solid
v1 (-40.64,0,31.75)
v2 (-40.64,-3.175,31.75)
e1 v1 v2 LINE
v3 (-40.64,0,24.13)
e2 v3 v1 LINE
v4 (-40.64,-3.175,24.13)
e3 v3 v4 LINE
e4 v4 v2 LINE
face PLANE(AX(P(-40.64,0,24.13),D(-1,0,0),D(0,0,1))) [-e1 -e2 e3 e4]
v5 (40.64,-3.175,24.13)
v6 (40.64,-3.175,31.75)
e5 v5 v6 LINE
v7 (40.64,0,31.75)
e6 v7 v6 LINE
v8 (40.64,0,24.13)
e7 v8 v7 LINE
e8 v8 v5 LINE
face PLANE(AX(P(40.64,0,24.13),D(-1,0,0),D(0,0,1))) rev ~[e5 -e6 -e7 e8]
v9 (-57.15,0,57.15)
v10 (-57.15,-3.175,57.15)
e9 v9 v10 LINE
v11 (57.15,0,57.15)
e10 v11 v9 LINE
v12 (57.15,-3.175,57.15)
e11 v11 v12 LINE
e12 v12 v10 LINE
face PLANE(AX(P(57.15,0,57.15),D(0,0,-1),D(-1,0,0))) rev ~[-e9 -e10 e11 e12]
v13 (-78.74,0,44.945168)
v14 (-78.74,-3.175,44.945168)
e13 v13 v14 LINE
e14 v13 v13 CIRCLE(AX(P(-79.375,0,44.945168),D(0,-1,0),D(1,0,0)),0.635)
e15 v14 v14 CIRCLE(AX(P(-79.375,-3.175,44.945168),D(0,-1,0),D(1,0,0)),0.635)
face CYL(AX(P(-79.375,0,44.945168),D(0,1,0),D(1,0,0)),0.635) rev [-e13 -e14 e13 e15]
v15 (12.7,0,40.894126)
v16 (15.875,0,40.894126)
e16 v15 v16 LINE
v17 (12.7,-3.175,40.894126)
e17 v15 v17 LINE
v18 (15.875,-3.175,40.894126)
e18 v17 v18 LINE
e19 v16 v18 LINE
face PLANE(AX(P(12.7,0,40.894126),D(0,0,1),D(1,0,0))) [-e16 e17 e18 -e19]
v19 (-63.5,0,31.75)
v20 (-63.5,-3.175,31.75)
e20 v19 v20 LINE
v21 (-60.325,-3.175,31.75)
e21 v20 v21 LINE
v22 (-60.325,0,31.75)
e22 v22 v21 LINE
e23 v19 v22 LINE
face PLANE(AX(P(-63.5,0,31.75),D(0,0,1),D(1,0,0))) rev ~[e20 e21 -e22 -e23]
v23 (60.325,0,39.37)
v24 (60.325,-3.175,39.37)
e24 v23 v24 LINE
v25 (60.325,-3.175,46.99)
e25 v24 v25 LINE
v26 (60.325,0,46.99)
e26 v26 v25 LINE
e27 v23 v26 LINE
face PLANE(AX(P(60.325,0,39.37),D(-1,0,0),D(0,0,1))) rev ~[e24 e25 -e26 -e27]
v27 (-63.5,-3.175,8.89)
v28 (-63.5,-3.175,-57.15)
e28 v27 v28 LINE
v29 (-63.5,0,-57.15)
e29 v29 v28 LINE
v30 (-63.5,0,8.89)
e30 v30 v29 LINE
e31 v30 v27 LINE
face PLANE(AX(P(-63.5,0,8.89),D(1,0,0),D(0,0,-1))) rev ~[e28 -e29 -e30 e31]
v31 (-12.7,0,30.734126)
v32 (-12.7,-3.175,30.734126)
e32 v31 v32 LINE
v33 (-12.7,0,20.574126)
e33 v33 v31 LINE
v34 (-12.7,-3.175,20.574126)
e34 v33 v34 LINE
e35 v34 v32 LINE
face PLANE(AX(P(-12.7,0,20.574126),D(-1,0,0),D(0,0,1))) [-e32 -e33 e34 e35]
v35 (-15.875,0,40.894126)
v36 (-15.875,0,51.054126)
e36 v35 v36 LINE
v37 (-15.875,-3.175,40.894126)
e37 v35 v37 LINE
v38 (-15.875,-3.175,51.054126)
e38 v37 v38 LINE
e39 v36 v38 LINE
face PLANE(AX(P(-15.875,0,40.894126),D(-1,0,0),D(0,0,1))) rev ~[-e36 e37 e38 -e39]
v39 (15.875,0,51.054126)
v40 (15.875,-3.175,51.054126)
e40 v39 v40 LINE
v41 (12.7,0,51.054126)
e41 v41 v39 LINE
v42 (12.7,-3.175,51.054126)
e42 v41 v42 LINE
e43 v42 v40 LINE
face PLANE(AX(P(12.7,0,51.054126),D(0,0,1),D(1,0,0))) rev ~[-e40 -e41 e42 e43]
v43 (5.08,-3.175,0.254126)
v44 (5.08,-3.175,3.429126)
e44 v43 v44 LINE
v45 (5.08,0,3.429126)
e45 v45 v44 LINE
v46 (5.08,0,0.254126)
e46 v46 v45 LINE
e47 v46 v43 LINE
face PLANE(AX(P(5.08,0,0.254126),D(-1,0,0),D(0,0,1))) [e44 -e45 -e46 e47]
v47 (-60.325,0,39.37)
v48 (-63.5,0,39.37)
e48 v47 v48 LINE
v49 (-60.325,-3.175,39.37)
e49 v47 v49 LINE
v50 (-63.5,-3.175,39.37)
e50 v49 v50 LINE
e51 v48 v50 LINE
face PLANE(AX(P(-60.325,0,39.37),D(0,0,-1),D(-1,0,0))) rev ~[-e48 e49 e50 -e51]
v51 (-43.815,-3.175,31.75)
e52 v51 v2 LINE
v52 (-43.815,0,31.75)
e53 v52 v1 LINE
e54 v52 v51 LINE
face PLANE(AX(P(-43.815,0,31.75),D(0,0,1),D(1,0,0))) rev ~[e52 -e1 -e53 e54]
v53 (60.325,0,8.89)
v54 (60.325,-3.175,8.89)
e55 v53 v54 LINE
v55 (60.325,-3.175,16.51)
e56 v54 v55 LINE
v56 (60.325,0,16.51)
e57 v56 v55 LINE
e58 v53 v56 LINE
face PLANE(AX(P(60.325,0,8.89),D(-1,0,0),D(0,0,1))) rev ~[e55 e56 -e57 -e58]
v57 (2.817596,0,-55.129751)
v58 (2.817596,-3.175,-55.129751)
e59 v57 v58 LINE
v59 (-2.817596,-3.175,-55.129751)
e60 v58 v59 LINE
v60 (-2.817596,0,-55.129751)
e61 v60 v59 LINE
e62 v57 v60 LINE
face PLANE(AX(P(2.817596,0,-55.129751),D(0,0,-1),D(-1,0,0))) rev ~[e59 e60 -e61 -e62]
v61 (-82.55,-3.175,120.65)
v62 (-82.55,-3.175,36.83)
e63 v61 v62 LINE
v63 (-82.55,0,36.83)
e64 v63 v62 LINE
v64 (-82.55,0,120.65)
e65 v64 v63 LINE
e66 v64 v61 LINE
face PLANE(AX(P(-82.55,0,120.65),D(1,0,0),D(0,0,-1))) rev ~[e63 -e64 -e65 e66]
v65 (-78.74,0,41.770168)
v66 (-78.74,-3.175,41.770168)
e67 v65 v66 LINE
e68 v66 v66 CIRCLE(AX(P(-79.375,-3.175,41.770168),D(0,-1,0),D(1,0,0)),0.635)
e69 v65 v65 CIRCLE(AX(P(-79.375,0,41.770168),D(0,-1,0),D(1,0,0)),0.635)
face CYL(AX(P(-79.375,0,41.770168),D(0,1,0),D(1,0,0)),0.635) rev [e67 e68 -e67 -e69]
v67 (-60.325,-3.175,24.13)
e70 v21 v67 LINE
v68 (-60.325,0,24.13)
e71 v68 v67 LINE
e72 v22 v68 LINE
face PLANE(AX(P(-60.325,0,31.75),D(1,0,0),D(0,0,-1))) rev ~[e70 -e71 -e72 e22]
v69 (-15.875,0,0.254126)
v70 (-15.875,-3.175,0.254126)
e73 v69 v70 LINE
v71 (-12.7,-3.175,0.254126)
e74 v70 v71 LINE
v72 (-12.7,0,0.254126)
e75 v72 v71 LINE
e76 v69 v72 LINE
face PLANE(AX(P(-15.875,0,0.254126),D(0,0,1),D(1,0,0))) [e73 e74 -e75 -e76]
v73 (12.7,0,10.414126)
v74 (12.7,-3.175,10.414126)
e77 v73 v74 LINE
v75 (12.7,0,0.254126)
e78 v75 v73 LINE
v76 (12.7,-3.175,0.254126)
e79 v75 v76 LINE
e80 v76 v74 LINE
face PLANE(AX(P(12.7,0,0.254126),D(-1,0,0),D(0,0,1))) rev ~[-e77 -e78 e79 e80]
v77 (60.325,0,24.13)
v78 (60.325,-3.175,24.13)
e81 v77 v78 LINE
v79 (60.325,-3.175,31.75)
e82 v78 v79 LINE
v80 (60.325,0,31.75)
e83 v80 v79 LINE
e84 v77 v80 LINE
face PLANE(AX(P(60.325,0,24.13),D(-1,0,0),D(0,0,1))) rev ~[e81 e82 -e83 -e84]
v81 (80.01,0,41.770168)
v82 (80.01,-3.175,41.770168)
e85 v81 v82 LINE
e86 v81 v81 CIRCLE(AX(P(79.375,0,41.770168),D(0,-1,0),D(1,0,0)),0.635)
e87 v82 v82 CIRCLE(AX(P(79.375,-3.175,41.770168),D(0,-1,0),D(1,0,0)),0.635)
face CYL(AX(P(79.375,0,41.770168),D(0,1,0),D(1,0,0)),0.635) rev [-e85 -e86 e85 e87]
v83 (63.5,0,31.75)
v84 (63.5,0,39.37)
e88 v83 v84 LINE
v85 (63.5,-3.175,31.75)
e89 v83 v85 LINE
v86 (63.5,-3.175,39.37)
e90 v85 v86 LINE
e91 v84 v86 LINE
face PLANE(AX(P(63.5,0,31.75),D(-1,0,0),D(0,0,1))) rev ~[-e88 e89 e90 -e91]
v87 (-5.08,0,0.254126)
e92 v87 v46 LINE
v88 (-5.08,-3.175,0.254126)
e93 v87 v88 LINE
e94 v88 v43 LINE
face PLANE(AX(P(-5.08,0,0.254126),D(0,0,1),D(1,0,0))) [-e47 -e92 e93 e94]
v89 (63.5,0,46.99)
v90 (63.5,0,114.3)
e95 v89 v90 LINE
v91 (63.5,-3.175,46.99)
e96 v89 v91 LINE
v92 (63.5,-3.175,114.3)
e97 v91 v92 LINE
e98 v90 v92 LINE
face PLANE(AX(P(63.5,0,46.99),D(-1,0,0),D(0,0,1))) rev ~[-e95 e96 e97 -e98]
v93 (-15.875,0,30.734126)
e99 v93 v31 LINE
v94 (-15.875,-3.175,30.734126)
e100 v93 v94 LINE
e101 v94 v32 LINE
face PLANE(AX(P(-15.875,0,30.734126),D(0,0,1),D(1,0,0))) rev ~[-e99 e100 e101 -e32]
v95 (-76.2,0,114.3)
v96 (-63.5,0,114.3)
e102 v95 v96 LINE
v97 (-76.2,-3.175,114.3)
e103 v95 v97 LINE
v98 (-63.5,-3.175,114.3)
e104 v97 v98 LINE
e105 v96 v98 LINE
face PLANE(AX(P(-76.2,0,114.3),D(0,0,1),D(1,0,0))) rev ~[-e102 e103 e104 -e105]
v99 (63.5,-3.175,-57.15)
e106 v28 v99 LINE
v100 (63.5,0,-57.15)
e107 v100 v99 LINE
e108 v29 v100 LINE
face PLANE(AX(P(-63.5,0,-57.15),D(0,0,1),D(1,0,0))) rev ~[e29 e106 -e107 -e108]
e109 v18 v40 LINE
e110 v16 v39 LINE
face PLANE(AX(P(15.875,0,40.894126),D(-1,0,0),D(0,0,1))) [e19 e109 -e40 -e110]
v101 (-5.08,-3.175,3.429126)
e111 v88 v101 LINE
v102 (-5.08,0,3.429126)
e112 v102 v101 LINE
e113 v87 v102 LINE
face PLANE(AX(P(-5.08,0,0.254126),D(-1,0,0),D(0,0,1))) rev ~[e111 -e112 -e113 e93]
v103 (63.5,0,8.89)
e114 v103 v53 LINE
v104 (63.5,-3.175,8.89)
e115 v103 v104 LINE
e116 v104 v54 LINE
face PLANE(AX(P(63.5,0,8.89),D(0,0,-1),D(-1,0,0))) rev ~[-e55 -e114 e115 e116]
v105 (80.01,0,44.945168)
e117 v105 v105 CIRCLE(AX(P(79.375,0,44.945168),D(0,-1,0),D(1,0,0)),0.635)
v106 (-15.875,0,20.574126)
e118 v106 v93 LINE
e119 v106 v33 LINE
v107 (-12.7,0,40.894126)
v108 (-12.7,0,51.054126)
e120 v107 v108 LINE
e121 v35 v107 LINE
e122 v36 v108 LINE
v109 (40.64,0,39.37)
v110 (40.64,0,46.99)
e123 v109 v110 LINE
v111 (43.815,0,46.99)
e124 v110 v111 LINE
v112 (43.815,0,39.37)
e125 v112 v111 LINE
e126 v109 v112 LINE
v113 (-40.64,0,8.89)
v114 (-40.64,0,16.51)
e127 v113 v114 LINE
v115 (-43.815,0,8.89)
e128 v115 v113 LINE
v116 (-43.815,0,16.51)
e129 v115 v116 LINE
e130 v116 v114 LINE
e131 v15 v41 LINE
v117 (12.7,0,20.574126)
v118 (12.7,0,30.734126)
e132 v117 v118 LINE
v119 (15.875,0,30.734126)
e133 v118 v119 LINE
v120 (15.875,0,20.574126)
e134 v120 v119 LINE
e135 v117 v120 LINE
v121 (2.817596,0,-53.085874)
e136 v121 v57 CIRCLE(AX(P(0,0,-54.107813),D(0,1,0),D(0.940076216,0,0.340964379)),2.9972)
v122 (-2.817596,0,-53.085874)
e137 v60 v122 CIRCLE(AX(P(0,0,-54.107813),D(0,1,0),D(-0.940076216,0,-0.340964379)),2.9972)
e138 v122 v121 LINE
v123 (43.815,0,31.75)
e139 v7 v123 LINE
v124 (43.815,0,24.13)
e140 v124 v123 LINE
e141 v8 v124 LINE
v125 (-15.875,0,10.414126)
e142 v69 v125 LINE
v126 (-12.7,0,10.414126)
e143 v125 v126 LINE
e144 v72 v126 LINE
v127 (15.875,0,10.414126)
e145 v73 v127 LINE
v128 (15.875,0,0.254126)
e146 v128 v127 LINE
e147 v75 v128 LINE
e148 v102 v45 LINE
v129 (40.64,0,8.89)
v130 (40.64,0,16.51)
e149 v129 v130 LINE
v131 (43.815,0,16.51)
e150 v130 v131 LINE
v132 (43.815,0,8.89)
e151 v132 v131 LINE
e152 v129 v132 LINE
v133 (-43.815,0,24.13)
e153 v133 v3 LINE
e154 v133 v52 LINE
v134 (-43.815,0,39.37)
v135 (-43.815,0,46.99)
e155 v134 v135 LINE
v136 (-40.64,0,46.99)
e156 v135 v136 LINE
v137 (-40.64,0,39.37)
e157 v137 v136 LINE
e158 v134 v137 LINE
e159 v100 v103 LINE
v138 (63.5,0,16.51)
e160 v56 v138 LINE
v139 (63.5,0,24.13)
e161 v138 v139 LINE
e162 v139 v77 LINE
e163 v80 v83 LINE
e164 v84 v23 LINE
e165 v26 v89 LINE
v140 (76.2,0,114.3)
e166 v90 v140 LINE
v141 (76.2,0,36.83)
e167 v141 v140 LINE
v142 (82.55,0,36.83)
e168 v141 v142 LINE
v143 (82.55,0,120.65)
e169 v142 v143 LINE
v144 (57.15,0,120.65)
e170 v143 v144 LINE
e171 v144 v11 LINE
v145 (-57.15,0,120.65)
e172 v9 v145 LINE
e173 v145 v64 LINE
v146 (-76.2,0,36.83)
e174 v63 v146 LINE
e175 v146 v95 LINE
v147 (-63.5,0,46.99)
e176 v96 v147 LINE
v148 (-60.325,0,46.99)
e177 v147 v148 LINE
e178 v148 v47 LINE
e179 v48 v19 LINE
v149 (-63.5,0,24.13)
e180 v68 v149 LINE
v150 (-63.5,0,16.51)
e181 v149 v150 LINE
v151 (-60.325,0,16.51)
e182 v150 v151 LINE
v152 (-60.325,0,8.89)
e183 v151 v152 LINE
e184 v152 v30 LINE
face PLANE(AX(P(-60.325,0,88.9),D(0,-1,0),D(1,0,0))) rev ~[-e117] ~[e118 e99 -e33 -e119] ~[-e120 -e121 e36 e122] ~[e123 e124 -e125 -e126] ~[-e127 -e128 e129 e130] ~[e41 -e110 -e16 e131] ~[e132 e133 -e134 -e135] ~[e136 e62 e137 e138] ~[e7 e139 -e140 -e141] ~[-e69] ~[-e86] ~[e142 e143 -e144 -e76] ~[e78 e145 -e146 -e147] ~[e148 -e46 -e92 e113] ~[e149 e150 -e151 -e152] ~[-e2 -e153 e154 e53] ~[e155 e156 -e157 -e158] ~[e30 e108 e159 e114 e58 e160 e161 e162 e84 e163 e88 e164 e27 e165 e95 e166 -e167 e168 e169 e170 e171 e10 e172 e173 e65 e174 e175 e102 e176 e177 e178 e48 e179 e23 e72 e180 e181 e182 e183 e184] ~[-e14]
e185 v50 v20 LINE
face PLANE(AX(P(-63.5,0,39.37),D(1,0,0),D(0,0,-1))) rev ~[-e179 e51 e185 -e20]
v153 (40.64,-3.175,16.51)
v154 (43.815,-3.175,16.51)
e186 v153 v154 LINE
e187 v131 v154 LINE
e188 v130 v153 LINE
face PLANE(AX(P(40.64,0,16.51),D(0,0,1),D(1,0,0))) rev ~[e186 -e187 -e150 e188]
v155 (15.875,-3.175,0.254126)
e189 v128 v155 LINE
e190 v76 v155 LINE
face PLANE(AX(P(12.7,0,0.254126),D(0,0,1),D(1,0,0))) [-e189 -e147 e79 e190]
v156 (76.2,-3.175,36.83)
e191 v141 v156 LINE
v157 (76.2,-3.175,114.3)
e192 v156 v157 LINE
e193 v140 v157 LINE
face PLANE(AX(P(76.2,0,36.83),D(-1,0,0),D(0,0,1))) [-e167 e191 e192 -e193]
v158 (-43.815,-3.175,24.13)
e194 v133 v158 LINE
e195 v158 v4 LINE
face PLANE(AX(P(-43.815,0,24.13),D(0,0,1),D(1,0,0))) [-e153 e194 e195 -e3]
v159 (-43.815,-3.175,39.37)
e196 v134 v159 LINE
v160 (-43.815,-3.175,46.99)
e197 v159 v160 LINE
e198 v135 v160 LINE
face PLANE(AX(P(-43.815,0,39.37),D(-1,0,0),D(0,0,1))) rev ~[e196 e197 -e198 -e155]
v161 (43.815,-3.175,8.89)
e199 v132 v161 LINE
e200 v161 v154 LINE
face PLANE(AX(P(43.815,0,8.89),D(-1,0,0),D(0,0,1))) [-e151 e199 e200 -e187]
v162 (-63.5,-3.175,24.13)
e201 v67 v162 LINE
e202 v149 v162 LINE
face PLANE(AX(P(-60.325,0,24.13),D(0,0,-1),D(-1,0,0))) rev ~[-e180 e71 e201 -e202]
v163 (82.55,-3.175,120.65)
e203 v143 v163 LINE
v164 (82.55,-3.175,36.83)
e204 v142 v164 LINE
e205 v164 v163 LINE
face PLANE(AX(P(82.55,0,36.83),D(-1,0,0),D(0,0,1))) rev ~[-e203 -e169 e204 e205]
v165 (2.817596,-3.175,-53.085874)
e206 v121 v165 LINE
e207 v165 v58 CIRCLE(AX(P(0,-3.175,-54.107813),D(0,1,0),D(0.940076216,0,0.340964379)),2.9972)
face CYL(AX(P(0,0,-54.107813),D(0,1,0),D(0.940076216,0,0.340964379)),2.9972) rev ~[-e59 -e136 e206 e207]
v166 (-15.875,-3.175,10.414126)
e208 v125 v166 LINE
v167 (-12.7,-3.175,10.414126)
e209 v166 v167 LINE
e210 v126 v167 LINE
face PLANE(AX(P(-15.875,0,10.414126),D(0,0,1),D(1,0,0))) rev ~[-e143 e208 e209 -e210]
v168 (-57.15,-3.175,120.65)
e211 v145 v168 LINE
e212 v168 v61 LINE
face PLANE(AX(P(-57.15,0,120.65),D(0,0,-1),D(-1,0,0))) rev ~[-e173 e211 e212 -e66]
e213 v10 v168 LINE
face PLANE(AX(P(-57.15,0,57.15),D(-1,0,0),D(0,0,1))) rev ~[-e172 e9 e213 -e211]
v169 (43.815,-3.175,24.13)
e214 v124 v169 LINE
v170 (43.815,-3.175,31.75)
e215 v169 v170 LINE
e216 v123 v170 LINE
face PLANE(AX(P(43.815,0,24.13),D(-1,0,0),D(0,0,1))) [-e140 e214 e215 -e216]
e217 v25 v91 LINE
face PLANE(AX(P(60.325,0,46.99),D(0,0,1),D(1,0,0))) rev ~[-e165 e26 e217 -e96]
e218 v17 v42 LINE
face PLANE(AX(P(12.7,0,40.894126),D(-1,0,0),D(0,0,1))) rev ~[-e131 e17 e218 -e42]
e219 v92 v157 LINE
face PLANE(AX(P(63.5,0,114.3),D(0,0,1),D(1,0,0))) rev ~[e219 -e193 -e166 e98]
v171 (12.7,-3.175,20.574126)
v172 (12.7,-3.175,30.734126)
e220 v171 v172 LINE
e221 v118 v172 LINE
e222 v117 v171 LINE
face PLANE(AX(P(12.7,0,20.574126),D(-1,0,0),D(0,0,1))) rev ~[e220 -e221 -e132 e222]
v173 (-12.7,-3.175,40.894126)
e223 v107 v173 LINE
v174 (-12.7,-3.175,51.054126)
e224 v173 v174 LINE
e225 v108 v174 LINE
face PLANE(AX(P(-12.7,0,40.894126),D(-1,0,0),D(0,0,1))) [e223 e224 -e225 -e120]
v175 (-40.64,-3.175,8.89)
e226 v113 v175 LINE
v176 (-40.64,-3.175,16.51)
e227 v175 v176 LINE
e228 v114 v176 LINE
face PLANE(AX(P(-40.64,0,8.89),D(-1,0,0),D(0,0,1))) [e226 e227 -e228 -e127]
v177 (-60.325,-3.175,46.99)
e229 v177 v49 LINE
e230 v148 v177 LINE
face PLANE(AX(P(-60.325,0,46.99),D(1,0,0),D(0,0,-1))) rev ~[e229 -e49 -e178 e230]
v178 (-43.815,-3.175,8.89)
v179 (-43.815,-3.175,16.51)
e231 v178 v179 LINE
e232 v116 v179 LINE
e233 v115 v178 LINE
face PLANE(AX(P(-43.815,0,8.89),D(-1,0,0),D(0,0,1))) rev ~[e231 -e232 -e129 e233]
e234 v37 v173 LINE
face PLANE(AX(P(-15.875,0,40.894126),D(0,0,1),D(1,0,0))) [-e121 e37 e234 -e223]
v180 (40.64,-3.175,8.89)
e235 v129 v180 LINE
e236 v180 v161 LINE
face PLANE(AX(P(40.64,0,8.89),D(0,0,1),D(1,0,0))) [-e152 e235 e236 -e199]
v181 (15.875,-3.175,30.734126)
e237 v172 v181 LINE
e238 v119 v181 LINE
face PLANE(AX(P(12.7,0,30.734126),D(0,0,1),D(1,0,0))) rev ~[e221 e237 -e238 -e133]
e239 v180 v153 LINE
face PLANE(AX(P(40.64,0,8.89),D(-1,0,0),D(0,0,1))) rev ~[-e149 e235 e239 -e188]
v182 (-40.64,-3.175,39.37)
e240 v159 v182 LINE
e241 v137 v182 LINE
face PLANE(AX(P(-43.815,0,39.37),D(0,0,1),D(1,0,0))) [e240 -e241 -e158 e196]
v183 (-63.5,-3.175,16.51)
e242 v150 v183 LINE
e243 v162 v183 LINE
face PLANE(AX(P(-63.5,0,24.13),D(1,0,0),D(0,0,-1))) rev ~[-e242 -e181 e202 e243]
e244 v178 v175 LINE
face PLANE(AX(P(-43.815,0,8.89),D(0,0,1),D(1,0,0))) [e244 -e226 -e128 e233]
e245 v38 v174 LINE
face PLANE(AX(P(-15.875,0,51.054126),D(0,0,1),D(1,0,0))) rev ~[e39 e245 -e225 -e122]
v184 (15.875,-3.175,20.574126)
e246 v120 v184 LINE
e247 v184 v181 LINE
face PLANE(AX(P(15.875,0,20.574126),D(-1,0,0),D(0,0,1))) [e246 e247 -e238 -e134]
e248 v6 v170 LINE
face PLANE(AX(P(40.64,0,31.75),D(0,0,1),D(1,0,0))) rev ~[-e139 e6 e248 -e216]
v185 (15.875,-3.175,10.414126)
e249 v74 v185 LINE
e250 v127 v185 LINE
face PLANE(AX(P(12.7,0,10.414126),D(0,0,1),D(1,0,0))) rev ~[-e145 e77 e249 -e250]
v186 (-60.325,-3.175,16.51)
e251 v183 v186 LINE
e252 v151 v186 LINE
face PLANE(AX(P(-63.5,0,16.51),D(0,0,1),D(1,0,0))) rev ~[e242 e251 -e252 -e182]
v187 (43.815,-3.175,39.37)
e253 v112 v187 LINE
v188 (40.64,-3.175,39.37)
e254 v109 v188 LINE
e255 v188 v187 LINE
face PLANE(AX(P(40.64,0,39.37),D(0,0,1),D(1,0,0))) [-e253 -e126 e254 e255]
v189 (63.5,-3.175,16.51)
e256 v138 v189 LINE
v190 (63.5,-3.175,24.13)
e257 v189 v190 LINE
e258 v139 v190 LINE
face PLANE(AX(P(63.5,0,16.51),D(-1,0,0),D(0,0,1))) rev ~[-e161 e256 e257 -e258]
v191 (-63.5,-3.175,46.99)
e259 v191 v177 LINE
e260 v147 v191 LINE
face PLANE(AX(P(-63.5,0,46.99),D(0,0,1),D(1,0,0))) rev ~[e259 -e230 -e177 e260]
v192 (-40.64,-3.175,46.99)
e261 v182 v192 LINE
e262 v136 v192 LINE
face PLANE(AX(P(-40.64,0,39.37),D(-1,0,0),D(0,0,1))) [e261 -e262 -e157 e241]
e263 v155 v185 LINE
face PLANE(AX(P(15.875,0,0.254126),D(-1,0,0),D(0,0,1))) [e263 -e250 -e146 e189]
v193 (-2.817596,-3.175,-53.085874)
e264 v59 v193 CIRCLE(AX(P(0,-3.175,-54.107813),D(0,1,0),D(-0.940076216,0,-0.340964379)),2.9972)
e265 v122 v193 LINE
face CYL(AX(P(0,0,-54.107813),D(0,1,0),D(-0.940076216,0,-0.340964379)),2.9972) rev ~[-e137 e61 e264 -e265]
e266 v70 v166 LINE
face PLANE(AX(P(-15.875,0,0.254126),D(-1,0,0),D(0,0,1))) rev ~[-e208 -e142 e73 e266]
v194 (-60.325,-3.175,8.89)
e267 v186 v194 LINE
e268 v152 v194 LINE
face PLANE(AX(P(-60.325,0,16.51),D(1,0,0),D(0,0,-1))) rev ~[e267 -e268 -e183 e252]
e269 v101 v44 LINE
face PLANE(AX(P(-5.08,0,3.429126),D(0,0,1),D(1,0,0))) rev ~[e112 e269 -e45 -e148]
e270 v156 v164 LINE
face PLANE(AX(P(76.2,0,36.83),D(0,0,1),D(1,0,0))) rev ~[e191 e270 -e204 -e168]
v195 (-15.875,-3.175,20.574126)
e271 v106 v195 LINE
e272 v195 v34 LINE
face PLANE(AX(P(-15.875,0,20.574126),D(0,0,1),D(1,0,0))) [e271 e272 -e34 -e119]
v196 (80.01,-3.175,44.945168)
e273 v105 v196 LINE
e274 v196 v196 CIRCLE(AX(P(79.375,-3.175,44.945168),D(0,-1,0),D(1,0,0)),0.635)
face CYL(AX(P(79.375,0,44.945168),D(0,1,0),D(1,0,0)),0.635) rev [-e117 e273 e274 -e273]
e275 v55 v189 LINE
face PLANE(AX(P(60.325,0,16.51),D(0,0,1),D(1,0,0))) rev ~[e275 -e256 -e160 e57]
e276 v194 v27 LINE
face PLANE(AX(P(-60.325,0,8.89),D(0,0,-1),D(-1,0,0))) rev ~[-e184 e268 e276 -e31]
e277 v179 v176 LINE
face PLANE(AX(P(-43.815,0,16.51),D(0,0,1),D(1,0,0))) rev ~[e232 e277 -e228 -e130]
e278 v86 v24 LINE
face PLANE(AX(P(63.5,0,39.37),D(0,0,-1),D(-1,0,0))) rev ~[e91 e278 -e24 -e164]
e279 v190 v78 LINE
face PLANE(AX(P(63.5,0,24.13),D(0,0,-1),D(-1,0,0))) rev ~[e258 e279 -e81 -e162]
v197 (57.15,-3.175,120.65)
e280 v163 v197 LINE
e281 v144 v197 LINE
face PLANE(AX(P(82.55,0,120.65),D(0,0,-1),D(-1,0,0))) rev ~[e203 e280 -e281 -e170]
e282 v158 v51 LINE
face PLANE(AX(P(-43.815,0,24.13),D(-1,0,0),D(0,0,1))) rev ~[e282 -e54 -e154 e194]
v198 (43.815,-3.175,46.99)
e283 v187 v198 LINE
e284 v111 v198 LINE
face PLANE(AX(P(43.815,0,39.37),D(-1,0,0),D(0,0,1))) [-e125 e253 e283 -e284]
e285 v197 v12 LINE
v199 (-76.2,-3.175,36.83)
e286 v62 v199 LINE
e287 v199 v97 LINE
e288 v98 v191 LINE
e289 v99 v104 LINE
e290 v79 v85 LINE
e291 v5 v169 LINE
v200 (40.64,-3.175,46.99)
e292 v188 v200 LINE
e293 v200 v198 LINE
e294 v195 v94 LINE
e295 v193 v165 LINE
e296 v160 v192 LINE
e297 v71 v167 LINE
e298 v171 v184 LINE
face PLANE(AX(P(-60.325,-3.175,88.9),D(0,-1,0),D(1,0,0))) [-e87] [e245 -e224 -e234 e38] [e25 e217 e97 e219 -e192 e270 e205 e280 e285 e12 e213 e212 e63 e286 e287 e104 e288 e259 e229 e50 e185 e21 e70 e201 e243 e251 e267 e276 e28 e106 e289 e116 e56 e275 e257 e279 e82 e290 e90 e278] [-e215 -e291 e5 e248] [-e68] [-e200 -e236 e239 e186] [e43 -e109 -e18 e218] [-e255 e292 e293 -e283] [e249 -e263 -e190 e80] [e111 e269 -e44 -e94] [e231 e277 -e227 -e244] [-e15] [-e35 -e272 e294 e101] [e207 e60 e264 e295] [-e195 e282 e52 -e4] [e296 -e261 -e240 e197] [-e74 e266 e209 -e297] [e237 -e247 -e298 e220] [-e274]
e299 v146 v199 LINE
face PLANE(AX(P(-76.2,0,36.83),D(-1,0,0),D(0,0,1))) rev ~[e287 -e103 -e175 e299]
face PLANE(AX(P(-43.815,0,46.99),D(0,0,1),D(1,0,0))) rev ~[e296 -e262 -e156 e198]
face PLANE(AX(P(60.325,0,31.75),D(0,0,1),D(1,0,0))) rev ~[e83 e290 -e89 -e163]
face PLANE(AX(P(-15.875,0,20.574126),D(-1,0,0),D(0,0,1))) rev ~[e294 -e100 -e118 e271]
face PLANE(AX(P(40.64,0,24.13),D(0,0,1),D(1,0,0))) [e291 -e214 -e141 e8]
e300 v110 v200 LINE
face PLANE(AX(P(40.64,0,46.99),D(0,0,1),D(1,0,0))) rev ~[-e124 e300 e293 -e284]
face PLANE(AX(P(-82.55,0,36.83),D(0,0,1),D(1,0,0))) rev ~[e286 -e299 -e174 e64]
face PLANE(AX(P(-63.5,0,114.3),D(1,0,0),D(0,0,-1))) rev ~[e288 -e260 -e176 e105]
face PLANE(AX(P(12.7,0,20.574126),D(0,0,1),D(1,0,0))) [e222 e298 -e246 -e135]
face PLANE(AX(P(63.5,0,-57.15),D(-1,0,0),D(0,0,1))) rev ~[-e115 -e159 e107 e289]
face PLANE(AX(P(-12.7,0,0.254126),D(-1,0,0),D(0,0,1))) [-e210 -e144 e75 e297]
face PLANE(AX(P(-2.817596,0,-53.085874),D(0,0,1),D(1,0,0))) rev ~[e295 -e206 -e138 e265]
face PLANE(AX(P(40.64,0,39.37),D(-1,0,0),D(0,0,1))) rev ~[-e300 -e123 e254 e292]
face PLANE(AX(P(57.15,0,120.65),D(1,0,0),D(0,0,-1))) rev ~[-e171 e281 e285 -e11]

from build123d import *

# Parameters (mm, degrees)
F0_W     = 12.7
F0_H     = 6.35
F0_W_2   = 6.35
F0_H_2   = 77.47
F0_R     = 0.635
F0_W_3   = 3.175
F0_H_3   = 7.62
F0_H_4   = 10.16
F0_W_4   = 10.16
F0_H_5   = 3.175
F1_DEPTH = 3.175


# Not quite as in the source:
# - a feature names something its author has since deleted; it is built from what else it names


with BuildPart() as f1:
    # F0 (on Front) → F1 (new body)
    with BuildSketch(Plane.XZ):
        Polygon((-63.5, 57.15), (-57.15, 57.15), (-57.15, 120.65), (-63.5, 120.65), (-63.5, 114.3), align=None)
        with Locations((-69.85, 117.475)):
            Rectangle(F0_W, F0_H)
        with Locations((-79.375, 117.475)):
            Rectangle(F0_W_2, F0_H)
        with Locations((-79.375, 75.565)):
            Rectangle(F0_W_2, F0_H_2)
        with Locations((-79.375, 41.7701676488)):
            Circle(F0_R, mode=Mode.SUBTRACT)
        with Locations((-79.375, 44.9451676488)):
            Circle(F0_R, mode=Mode.SUBTRACT)
        Polygon((57.15, 57.15), (63.5, 57.15), (63.5, 114.3), (63.5, 120.65), (57.15, 120.65), align=None)
        Polygon((63.5, 120.65), (63.5, 114.3), (76.2, 114.3), (82.55, 114.3), (82.55, 120.65), align=None)
        with Locations((79.375, 75.565)):
            Rectangle(F0_W_2, F0_H_2)
        with Locations((79.375, 41.7701676488)):
            Circle(F0_R, mode=Mode.SUBTRACT)
        with Locations((79.375, 44.9451676488)):
            Circle(F0_R, mode=Mode.SUBTRACT)
        Polygon((63.5, 46.99), (63.5, 57.15), (57.15, 57.15), (-57.15, 57.15), (-63.5, 57.15), (-63.5, 46.99), (-60.325, 46.99), (-60.325, 39.37), (-63.5, 39.37), (-63.5, 31.75), (-60.325, 31.75), (-60.325, 24.13), (-63.5, 24.13), (-63.5, 16.51), (-60.325, 16.51), (-60.325, 8.89), (-63.5, 8.89), (-63.5, -57.15), (63.5, -57.15), (63.5, 8.89), (60.325, 8.89), (60.325, 16.51), (63.5, 16.51), (63.5, 24.13), (60.325, 24.13), (60.325, 31.75), (63.5, 31.75), (63.5, 39.37), (60.325, 39.37), (60.325, 46.99), align=None)
        with Locations((-42.2275, 12.7)):
            Rectangle(F0_W_3, F0_H_3, mode=Mode.SUBTRACT)
        with Locations((-42.2275, 27.94)):
            Rectangle(F0_W_3, F0_H_3, mode=Mode.SUBTRACT)
        with Locations((-14.2875, 5.3341257808)):
            Rectangle(F0_W_3, F0_H_4, mode=Mode.SUBTRACT)
        with Locations((-14.2875, 25.6541257808)):
            Rectangle(F0_W_3, F0_H_4, mode=Mode.SUBTRACT)
        with BuildLine():
            ThreePointArc((2.8175964356, -53.0858742192), (2.9972, -54.1078126547), (2.8175964356, -55.1297510902))
            Line((2.8175964356, -55.1297510902), (-2.8175964356, -55.1297510902))
            ThreePointArc((-2.8175964356, -55.1297510902), (-2.9972, -54.1078126547), (-2.8175964356, -53.0858742192))
            Line((-2.8175964356, -53.0858742192), (2.8175964356, -53.0858742192))
        make_face(mode=Mode.SUBTRACT)
        with Locations((0, 1.8416257808)):
            Rectangle(F0_W_4, F0_H_5, mode=Mode.SUBTRACT)
        with Locations((14.2875, 5.3341257808)):
            Rectangle(F0_W_3, F0_H_4, mode=Mode.SUBTRACT)
        with Locations((14.2875, 25.6541257808)):
            Rectangle(F0_W_3, F0_H_4, mode=Mode.SUBTRACT)
        with Locations((42.2275, 12.7)):
            Rectangle(F0_W_3, F0_H_3, mode=Mode.SUBTRACT)
        with Locations((42.2275, 27.94)):
            Rectangle(F0_W_3, F0_H_3, mode=Mode.SUBTRACT)
        with Locations((-42.2275, 43.18)):
            Rectangle(F0_W_3, F0_H_3, mode=Mode.SUBTRACT)
        with Locations((-14.2875, 45.9741257808)):
            Rectangle(F0_W_3, F0_H_4, mode=Mode.SUBTRACT)
        with Locations((14.2875, 45.9741257808)):
            Rectangle(F0_W_3, F0_H_4, mode=Mode.SUBTRACT)
        with Locations((42.2275, 43.18)):
            Rectangle(F0_W_3, F0_H_3, mode=Mode.SUBTRACT)
    extrude(amount=F1_DEPTH)


solid = f1.part
